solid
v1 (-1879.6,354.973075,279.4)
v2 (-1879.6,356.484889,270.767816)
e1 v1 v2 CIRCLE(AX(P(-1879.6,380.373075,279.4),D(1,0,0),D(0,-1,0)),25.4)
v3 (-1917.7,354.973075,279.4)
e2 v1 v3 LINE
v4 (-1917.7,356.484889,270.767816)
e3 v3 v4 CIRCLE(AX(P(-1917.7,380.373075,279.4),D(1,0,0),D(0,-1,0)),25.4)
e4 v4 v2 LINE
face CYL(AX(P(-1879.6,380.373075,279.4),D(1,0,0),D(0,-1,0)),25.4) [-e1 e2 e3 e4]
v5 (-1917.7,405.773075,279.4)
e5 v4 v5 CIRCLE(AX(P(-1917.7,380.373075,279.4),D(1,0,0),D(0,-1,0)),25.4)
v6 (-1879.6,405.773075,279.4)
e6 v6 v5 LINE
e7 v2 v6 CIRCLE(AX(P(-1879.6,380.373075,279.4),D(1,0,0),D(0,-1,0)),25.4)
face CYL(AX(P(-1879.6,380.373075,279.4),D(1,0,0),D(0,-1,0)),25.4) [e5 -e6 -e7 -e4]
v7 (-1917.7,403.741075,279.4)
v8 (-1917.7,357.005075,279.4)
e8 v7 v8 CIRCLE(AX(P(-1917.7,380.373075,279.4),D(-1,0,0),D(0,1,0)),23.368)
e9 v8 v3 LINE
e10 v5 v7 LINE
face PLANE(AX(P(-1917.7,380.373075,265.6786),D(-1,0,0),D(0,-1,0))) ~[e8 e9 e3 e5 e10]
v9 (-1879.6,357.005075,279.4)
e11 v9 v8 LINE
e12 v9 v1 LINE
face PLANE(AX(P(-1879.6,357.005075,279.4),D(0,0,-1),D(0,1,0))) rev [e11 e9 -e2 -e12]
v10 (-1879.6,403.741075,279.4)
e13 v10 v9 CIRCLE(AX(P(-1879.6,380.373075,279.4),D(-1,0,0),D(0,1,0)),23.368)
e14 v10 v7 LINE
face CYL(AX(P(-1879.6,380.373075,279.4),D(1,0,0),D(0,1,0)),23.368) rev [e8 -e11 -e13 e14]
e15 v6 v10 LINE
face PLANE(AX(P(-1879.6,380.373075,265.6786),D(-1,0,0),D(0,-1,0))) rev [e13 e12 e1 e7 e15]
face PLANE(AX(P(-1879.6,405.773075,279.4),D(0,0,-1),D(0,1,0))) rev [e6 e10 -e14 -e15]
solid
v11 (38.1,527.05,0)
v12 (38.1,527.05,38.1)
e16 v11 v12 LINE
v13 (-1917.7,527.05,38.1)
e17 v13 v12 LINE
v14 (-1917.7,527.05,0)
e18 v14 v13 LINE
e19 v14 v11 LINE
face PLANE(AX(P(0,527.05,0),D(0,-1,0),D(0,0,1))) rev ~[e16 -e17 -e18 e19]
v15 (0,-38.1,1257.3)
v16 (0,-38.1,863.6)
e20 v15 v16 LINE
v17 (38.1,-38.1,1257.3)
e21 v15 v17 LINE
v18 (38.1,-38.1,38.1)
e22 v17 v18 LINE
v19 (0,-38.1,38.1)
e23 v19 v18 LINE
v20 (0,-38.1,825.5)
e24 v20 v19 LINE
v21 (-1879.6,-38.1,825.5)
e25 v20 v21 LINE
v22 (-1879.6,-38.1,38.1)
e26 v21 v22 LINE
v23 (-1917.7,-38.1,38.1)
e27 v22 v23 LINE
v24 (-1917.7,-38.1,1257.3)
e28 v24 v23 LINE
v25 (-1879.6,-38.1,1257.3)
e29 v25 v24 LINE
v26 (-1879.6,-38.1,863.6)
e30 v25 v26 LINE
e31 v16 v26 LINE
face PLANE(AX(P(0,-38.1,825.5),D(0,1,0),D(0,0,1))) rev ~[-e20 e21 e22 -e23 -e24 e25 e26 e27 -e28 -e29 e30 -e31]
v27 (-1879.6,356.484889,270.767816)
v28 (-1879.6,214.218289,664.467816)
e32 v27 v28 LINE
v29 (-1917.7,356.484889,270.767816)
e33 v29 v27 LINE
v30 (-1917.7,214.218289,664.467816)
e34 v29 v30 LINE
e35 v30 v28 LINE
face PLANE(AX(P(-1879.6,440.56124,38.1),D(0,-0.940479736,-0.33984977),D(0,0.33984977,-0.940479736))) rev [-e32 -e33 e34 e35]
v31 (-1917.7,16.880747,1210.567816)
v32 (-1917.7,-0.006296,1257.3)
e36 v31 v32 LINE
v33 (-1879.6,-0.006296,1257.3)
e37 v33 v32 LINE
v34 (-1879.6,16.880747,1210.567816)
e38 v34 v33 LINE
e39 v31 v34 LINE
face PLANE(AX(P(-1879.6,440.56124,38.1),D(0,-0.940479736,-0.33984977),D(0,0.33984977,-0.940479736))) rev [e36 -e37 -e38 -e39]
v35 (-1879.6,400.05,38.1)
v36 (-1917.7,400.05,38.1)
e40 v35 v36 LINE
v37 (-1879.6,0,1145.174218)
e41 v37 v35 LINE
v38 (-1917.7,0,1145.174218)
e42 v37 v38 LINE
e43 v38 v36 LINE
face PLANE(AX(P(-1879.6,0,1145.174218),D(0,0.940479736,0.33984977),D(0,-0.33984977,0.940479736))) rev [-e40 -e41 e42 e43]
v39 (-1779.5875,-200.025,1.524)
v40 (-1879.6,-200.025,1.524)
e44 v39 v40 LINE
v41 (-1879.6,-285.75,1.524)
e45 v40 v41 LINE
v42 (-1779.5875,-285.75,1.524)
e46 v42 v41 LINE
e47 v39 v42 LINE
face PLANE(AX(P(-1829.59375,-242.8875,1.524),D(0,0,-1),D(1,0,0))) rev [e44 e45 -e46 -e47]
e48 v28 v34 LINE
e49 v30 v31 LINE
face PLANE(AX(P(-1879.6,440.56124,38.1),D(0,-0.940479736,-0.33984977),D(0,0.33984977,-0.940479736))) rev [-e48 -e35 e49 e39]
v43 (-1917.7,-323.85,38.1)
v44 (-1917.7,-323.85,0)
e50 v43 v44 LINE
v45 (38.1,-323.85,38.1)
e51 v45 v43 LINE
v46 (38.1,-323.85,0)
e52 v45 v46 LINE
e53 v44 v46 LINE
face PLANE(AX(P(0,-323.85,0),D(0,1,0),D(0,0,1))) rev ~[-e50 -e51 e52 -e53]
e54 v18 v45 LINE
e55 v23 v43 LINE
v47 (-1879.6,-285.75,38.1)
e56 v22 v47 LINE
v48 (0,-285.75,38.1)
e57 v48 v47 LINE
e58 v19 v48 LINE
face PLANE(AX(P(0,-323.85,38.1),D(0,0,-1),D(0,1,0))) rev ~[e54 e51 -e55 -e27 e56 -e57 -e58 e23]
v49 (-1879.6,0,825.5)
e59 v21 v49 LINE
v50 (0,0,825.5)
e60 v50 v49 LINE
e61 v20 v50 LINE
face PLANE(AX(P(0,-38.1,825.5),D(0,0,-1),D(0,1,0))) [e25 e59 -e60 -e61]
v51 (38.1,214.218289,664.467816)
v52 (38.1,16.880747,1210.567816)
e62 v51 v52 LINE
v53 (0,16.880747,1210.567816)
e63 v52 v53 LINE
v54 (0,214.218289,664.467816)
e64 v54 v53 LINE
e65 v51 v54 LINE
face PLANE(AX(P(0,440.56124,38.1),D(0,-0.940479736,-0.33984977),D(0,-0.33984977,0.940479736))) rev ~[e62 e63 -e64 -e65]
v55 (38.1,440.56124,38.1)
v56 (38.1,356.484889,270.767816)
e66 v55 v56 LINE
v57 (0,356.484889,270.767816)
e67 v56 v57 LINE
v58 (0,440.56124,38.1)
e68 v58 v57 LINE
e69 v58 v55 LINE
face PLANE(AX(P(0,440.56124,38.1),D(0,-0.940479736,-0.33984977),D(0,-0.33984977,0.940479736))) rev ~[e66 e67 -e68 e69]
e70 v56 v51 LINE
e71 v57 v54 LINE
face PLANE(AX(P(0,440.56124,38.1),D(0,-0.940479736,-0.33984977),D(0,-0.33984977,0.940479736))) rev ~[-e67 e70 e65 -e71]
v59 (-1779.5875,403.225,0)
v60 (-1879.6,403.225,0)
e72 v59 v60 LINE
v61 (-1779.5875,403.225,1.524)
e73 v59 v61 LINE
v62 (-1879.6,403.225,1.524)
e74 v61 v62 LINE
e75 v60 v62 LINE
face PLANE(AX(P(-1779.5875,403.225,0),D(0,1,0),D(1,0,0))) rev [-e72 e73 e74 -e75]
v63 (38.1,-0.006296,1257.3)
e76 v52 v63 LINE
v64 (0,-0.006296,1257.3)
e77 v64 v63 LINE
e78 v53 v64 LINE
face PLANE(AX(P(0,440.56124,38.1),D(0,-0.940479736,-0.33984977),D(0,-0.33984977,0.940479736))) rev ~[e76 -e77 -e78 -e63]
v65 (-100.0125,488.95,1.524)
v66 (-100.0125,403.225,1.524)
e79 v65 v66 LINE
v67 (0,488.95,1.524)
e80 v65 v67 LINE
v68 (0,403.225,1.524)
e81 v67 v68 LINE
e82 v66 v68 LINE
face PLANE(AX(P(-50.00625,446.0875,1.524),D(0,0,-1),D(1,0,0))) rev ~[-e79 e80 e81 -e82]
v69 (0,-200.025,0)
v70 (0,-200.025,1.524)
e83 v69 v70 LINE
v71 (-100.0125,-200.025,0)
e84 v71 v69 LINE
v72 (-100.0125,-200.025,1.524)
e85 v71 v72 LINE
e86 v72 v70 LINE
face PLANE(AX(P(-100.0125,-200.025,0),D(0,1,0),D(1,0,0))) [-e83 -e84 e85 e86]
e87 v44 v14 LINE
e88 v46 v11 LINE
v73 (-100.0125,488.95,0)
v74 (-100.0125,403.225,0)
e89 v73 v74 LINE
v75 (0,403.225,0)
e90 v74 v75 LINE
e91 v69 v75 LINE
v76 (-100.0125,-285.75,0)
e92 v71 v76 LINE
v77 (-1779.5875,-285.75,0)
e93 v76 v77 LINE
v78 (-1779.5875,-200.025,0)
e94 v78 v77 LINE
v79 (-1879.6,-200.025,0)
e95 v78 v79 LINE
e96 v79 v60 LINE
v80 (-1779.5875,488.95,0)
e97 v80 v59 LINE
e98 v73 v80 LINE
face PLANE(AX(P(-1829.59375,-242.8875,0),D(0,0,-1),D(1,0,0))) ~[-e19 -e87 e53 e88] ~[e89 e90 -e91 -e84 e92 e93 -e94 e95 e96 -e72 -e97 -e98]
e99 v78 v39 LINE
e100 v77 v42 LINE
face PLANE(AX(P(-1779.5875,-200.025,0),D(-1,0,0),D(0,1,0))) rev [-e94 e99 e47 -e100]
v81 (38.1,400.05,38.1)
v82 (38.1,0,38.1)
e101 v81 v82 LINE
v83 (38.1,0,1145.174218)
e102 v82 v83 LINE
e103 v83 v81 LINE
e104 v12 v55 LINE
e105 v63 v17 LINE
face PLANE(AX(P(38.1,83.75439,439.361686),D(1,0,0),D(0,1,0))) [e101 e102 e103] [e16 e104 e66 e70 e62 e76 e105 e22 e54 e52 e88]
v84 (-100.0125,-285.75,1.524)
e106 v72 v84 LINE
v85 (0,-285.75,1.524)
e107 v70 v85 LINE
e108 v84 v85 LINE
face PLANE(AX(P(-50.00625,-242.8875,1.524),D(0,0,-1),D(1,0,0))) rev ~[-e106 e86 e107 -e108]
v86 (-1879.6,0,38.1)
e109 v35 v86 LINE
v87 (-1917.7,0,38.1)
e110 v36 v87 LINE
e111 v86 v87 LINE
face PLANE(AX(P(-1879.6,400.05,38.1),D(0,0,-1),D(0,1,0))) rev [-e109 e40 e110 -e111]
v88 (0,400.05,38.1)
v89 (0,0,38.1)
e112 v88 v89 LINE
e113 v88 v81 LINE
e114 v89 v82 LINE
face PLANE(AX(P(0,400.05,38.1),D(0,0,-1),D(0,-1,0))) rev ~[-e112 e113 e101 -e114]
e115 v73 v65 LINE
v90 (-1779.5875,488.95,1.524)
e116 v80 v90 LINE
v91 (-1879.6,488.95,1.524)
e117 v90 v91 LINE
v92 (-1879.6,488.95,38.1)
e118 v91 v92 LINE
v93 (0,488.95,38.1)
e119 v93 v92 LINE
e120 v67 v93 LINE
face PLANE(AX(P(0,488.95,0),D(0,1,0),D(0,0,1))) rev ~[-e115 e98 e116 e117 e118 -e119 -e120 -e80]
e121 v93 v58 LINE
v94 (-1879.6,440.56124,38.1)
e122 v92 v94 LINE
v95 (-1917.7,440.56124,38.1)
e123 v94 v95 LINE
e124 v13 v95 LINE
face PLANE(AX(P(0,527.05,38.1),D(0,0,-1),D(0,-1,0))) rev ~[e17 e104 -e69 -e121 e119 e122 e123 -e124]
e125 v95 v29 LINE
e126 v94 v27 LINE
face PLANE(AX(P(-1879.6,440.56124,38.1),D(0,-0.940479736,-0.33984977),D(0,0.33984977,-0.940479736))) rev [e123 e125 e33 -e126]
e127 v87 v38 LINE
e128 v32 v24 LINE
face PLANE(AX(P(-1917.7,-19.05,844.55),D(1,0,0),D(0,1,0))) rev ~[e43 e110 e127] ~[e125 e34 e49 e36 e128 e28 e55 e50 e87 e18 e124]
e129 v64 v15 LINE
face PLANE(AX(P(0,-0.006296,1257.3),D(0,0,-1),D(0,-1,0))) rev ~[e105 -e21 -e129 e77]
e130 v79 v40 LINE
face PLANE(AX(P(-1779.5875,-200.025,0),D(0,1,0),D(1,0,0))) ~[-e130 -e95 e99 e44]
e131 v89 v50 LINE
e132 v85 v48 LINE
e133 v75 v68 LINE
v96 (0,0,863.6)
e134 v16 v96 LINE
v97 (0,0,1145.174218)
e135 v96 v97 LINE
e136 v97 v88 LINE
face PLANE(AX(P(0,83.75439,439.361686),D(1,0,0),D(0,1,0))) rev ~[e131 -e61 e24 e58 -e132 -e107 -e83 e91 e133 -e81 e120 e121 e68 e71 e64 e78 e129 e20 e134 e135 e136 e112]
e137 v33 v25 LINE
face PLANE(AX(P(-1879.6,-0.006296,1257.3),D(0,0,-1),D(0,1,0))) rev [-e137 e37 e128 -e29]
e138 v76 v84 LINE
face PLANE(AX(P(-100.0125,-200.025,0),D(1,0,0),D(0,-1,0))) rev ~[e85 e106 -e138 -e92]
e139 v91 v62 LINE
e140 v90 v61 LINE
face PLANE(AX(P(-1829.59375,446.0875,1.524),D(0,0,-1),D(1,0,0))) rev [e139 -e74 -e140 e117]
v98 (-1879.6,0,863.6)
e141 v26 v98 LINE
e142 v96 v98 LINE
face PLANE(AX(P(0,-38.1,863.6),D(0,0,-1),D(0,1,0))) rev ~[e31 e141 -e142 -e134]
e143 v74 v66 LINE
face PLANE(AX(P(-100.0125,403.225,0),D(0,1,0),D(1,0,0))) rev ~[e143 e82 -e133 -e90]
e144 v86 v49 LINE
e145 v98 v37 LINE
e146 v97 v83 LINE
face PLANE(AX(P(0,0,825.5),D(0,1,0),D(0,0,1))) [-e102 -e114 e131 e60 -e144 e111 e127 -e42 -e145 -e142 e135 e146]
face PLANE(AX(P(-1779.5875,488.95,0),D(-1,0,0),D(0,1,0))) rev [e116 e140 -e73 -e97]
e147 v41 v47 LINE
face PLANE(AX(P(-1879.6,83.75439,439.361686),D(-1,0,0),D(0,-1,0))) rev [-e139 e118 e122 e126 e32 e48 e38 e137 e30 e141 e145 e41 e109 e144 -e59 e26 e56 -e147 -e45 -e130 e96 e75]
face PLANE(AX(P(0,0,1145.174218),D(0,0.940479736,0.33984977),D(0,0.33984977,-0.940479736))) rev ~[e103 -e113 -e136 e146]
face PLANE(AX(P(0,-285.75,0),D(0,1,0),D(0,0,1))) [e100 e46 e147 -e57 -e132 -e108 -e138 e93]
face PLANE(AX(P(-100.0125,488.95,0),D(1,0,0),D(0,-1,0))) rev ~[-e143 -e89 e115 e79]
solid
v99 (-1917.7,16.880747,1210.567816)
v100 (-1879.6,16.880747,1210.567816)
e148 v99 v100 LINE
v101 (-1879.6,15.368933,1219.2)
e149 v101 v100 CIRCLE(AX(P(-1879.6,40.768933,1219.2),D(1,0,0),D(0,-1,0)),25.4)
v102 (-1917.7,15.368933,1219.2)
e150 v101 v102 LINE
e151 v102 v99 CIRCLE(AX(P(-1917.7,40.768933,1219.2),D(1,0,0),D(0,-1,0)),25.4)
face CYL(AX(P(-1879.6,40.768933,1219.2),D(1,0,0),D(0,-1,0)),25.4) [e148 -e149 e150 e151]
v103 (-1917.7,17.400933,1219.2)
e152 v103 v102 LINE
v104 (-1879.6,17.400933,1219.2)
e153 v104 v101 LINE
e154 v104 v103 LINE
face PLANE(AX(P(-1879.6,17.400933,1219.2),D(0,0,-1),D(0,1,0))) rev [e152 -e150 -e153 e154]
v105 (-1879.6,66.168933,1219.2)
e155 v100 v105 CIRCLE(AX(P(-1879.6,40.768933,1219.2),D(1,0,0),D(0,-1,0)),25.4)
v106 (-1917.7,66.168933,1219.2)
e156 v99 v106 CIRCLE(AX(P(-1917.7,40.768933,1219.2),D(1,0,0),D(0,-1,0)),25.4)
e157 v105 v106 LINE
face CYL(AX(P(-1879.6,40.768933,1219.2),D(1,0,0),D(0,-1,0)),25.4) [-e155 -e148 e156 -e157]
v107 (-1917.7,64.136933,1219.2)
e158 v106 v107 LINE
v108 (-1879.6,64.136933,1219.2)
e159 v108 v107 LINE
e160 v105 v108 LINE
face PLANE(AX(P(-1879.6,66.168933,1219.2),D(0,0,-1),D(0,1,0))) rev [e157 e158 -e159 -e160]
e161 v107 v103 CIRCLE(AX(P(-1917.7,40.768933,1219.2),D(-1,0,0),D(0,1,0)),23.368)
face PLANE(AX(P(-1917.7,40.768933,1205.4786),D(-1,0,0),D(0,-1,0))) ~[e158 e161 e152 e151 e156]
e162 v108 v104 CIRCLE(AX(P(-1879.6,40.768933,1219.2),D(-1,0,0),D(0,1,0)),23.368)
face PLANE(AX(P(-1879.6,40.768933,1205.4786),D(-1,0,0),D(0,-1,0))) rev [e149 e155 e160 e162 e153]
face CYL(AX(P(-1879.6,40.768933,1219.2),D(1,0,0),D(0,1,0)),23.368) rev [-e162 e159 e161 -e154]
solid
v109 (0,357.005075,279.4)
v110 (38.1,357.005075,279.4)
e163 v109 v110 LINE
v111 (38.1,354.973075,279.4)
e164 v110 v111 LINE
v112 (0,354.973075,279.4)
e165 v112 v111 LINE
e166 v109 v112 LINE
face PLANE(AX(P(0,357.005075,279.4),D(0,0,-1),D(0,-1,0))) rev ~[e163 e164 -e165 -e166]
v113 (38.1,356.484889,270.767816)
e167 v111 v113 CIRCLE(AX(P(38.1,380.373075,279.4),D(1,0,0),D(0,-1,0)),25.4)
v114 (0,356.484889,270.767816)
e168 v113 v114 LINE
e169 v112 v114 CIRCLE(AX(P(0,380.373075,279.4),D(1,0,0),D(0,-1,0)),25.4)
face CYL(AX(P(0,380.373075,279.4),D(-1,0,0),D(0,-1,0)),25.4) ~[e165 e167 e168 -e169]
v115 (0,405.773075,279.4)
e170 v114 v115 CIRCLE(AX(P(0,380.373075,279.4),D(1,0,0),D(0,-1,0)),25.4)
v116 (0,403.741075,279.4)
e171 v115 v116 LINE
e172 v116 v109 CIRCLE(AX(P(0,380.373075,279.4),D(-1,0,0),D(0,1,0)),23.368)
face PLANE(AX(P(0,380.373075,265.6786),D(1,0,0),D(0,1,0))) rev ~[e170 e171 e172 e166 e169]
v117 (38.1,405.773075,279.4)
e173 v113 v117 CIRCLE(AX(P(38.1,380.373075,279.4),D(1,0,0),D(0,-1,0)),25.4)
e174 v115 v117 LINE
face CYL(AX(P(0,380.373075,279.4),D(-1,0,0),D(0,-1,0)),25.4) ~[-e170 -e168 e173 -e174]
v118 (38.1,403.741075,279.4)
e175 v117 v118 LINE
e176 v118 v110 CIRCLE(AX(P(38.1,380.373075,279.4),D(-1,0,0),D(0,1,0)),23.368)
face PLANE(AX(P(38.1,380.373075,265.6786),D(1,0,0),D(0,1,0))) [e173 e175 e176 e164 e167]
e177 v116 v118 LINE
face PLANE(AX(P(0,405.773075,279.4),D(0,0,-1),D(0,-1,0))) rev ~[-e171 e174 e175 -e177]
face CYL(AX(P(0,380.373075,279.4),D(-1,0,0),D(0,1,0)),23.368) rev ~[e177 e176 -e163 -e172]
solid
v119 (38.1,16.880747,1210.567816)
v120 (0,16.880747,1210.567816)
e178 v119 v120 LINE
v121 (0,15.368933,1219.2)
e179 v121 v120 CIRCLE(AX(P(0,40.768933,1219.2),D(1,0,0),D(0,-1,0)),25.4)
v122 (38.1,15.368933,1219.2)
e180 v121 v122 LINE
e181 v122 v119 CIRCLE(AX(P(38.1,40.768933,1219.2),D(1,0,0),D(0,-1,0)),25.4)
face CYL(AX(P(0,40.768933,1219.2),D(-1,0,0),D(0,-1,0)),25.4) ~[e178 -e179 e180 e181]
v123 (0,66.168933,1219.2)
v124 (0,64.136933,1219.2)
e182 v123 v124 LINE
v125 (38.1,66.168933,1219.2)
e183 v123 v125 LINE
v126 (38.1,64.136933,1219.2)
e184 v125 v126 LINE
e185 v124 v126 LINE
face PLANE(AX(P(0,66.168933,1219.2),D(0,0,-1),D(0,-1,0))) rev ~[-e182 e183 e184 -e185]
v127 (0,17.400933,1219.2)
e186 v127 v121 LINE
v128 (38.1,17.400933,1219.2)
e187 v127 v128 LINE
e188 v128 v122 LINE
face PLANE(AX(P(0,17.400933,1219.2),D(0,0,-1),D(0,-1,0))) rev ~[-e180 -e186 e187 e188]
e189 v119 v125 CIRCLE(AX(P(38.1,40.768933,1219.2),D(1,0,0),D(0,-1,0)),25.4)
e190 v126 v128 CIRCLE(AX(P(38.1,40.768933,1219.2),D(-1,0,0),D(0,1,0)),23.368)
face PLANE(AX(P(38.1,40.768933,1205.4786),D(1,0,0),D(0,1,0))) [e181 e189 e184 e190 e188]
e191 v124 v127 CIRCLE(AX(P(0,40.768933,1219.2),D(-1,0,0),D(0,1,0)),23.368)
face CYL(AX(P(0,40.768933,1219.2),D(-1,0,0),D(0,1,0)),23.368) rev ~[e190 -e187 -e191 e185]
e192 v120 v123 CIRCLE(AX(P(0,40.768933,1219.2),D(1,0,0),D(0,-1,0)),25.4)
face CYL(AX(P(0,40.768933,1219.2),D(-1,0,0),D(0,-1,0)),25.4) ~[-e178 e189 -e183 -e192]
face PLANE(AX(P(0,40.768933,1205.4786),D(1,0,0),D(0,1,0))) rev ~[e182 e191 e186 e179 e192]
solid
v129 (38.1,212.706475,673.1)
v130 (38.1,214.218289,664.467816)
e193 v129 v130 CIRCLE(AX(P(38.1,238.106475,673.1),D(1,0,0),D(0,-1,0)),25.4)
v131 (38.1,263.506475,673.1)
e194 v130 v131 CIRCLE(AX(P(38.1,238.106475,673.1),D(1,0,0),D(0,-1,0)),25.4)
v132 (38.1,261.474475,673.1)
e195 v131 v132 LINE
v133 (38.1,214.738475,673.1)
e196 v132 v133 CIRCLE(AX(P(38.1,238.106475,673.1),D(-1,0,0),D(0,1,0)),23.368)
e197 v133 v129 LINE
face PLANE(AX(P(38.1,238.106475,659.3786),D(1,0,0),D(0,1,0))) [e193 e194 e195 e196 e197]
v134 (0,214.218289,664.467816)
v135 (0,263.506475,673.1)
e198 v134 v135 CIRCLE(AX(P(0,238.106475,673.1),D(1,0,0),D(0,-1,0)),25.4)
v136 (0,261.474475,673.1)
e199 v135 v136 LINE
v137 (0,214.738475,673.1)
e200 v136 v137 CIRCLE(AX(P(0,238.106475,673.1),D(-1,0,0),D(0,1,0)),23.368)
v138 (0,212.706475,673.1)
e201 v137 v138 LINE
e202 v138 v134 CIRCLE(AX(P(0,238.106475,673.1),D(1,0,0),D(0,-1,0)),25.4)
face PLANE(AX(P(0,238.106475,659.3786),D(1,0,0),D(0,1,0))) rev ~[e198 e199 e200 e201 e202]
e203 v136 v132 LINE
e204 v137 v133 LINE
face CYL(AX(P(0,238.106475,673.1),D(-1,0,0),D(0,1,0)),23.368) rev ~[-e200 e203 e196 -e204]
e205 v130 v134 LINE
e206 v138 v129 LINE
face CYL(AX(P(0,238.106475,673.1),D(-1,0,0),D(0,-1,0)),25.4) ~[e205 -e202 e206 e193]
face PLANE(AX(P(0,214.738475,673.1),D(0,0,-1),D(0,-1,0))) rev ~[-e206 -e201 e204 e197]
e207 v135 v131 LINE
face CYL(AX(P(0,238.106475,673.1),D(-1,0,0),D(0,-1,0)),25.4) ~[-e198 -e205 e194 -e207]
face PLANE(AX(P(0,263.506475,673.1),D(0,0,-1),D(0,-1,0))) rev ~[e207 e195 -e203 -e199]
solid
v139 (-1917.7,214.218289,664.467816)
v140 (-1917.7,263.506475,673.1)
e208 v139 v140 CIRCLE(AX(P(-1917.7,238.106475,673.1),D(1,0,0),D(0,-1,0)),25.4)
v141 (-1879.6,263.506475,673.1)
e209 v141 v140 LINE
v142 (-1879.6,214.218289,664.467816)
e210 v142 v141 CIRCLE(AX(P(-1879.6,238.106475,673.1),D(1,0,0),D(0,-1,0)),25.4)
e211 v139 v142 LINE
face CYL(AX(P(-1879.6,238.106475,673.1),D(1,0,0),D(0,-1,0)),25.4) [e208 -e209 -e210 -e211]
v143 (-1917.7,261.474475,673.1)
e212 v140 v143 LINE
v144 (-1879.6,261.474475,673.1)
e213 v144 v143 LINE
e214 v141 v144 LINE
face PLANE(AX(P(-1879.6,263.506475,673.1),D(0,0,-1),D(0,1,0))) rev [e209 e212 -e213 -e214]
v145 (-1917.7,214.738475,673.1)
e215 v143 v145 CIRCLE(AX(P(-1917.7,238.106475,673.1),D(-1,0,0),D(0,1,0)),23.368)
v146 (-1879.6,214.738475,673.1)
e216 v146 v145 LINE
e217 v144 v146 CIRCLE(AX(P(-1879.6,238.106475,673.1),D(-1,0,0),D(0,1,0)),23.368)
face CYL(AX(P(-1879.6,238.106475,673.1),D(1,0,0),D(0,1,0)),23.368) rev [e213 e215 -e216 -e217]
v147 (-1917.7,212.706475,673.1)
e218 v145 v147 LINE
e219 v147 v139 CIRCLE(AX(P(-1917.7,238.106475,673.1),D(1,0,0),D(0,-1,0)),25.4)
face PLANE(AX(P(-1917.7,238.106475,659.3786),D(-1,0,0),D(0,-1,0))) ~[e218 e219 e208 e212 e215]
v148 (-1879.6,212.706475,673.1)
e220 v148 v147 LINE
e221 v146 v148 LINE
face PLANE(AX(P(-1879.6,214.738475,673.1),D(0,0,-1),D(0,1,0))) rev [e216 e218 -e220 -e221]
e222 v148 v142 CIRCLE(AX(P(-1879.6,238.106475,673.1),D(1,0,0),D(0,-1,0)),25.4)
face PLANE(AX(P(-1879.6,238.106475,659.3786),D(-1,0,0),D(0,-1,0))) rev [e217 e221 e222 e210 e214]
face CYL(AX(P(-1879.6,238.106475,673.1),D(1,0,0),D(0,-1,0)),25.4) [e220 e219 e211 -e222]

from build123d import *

# Parameters (mm, degrees)
F1_DEPTH  = 38.1
F4_W      = 38.1
F4_H      = 38.1
F5_DEPTH  = 1879.6
F6_W      = 38.1
F6_H      = 38.1
F7_DEPTH  = 1917.7
F9_DEPTH  = 38.1
F11_W     = 100.0125
F11_H     = 85.725
F12_DEPTH = 1.524


# Not quite as in the source:
# - an extrude ends at something that could not be found from the text; its depth is read off the source's solid


with BuildPart() as f1:
    # F0 (on Right) → F1 (new body)
    with BuildSketch(Plane.YZ):
        Polygon((-323.85, 38.1), (-323.85, 0), (527.05, 0), (527.05, 38.1), (440.5612396804, 38.1), (-0.0062959033, 1257.3), (-38.1, 1257.3), (-38.1, 38.1), align=None)
        Polygon((400.05, 38.1), (0, 38.1), (0, 1145.1742181533), align=None, mode=Mode.SUBTRACT)
    extrude(amount=F1_DEPTH)


with BuildPart() as f3_1:
    # F3: instance of F1
    add(f1.part.mirror(Plane.YZ.offset(-939.8)))


with BuildPart() as f1_1:
    add(f1.part)

    add(f3_1.part)  # F5 merges F3_1
    # F4 (on Right) → F5 (join, through all)
    with BuildSketch(Plane.YZ):
        with Locations((-304.8, 19.05)):
            Rectangle(F4_W, F4_H)
        with Locations((508, 19.05)):
            Rectangle(F4_W, F4_H)
    extrude(amount=-F5_DEPTH)

    # F6 (on Right) → F7 (join, through all)
    with BuildSketch(Plane.YZ):
        with Locations((-19.05, 844.55)):
            Rectangle(F6_W, F6_H)
    extrude(amount=-F7_DEPTH)

    # F11 (on face) → F12 (join)
    with BuildSketch(Plane(origin=(0, 0, 0), x_dir=(1, 0, 0), z_dir=(0, 0, -1))):
        with Locations((-50.00625, 242.8875)):
            Rectangle(F11_W, F11_H)
        with Locations((-50.00625, -446.0875)):
            Rectangle(F11_W, F11_H)
    extrude(amount=-F12_DEPTH)



with BuildPart() as f9:
    # F8 (on Right) → F9 (new body)
    with BuildSketch(Plane.YZ):
        with BuildLine():
            ThreePointArc((15.3689327039, 1219.2), (40.7689327039, 1193.8), (66.1689327039, 1219.2))
            Line((66.1689327039, 1219.2), (64.1369327039, 1219.2))
            ThreePointArc((64.1369327039, 1219.2), (40.7689327039, 1195.832), (17.4009327039, 1219.2))
            Line((17.4009327039, 1219.2), (15.3689327039, 1219.2))
        make_face()
    extrude(amount=F9_DEPTH)


with BuildPart() as f9b:
    # F8 (on Right) → F9, piece 2 (new body)
    with BuildSketch(Plane.YZ):
        with BuildLine():
            ThreePointArc((212.7064746841, 673.1), (238.1064746841, 647.7), (263.5064746841, 673.1))
            Line((263.5064746841, 673.1), (261.4744746841, 673.1))
            ThreePointArc((261.4744746841, 673.1), (238.1064746841, 649.732), (214.7384746841, 673.1))
            Line((214.7384746841, 673.1), (212.7064746841, 673.1))
        make_face()
    extrude(amount=F9_DEPTH)


with BuildPart() as f9c:
    # F8 (on Right) → F9, piece 3 (new body)
    with BuildSketch(Plane.YZ):
        with BuildLine():
            ThreePointArc((354.9730747163, 279.4), (380.3730747163, 254), (405.7730747163, 279.4))
            Line((405.7730747163, 279.4), (403.7410747163, 279.4))
            ThreePointArc((403.7410747163, 279.4), (380.3730747163, 256.032), (357.0050747163, 279.4))
            Line((357.0050747163, 279.4), (354.9730747163, 279.4))
        make_face()
    extrude(amount=F9_DEPTH)


with BuildPart() as f10_1:
    # F10: instance of F9
    add(f9.part.mirror(Plane.YZ.offset(-939.8)))


with BuildPart() as f10_2:
    # F10: instance of F9b
    add(f9b.part.mirror(Plane.YZ.offset(-939.8)))


with BuildPart() as f10_3:
    # F10: instance of F9c
    add(f9c.part.mirror(Plane.YZ.offset(-939.8)))


with BuildPart() as f1_2:
    add(f1_1.part)

    add(f9.part)  # F13 merges F9

    add(f9b.part)  # F13 merges F9b

    add(f9c.part)  # F13 merges F9c

    add(f10_1.part)  # F13 merges F10_1

    add(f10_2.part)  # F13 merges F10_2

    add(f10_3.part)  # F13 merges F10_3
    # F13: F1 across plane
    add(f1_1.part.mirror(Plane.YZ.offset(-939.8)))


solid = f1_2.part
